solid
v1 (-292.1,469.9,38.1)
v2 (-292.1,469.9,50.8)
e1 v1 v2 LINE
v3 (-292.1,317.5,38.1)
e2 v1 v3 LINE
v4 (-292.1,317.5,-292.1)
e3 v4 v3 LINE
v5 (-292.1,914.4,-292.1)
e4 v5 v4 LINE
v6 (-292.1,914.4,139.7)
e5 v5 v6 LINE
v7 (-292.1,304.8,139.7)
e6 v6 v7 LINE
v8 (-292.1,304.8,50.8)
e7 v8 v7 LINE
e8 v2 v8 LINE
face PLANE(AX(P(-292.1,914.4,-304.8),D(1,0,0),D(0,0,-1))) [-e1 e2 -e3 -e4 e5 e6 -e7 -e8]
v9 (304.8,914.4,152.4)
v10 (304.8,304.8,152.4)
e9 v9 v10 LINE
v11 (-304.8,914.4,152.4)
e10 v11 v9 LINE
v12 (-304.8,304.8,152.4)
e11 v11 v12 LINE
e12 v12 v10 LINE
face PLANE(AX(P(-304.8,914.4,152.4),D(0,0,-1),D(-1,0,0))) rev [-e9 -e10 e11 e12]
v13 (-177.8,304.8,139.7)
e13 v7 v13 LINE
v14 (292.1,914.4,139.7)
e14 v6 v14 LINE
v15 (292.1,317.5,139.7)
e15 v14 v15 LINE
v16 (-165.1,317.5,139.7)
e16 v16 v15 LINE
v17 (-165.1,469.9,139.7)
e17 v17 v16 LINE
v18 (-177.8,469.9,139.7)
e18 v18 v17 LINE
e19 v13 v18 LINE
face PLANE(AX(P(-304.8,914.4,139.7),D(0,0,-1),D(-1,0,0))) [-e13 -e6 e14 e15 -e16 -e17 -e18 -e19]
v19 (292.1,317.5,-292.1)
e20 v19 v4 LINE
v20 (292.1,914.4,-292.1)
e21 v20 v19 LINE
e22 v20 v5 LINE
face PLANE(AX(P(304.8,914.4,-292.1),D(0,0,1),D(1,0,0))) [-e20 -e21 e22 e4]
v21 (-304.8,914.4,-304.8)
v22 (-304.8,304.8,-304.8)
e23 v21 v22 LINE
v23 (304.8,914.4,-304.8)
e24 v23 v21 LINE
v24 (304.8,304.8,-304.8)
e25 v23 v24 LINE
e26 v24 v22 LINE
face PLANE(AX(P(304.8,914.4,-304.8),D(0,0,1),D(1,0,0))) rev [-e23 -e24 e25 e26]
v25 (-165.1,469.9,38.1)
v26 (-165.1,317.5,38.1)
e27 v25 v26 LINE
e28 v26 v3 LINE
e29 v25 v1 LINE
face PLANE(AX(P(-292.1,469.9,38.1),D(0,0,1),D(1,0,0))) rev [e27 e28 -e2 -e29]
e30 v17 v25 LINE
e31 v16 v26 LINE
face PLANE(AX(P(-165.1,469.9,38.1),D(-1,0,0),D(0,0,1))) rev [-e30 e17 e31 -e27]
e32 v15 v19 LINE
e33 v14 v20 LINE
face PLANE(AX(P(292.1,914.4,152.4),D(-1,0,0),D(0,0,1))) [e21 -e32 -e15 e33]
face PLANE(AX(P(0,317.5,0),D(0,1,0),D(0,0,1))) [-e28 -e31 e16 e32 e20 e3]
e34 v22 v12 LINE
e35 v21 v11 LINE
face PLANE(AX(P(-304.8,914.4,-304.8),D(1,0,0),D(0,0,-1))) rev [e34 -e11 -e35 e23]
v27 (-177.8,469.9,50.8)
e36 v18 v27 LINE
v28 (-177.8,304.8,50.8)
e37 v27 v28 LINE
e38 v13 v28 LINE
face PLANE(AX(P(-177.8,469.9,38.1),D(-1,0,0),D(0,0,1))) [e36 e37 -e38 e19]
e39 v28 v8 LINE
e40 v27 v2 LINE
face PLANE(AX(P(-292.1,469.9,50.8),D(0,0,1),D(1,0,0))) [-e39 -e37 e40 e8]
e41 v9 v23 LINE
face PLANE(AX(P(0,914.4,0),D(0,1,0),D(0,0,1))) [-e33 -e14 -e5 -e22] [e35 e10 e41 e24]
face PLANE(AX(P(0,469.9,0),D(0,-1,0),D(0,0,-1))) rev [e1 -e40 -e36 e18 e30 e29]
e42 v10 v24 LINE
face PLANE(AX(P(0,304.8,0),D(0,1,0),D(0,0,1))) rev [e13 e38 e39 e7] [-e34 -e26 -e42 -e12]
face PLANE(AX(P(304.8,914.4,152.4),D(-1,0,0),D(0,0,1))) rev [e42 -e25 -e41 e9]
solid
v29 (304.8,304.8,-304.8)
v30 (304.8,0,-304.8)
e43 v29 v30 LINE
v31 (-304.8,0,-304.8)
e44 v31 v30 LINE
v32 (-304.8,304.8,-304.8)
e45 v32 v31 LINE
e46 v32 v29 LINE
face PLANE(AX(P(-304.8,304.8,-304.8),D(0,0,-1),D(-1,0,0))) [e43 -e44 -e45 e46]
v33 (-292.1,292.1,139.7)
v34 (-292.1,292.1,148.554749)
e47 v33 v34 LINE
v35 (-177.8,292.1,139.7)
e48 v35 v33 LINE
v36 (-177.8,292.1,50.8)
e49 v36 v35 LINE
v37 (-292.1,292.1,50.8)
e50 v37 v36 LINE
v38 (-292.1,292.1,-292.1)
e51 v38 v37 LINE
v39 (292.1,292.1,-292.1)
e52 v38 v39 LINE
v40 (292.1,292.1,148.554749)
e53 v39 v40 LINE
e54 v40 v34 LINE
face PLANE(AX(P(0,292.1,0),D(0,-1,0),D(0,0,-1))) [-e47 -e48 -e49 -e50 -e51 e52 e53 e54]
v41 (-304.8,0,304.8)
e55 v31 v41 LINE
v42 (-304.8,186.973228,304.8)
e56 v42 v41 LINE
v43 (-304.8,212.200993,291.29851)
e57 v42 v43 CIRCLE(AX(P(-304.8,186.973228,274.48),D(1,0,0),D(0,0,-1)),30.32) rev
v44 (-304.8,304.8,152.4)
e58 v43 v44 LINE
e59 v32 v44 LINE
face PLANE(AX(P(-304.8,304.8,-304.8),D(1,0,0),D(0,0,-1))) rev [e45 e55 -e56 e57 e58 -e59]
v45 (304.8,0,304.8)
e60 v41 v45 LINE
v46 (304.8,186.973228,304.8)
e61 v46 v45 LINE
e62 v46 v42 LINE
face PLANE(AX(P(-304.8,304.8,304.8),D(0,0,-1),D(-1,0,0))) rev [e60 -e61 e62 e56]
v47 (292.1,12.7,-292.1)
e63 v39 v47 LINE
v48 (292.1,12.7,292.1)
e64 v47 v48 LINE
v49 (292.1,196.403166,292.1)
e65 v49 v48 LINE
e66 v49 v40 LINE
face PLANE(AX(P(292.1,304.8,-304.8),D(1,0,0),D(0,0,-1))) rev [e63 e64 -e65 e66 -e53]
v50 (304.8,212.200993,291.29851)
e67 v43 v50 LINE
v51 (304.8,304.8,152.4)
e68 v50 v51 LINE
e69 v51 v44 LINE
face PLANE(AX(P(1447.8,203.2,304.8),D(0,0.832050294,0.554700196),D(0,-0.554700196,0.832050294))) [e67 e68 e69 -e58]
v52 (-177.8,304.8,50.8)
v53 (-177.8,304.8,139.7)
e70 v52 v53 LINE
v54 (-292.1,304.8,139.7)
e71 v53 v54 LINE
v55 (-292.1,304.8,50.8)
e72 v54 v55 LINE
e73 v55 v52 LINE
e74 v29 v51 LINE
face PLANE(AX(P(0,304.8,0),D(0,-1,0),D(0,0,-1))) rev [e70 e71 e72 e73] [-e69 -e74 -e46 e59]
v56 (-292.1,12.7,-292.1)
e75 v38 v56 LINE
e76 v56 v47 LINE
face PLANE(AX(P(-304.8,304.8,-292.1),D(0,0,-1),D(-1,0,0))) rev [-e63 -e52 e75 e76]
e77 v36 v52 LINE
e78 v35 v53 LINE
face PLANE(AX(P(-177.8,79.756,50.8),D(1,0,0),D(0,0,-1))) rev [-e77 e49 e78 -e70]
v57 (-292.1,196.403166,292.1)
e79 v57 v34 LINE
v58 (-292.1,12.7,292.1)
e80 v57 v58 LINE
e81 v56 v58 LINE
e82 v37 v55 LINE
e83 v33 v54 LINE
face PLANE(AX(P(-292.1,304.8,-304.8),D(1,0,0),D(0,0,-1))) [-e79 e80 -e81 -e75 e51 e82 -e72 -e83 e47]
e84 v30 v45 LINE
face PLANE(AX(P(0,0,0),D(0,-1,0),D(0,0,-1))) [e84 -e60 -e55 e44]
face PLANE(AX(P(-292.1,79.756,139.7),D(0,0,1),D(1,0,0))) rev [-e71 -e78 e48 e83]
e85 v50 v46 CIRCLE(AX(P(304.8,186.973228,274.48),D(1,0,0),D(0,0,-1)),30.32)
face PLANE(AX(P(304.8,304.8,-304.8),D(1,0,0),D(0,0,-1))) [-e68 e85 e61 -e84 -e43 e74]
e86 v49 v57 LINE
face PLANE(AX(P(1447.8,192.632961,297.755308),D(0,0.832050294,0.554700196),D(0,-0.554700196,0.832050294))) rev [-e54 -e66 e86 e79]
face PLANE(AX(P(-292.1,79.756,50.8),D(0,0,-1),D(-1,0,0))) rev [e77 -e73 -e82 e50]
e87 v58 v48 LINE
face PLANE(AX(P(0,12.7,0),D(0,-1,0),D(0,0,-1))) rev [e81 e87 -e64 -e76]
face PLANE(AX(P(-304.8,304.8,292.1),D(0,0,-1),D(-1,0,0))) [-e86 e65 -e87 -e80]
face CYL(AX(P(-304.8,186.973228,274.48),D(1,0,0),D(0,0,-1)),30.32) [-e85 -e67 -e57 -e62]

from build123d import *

# Parameters (mm, degrees)
SKETCH1_W               = 609.6
SKETCH1_H               = 609.6
BOSS_EXTRUDE1_DEPTH     = 304.8
CUT_EXTRUDE2_DEPTH      = 747.6044736
CUT_EXTRUDE2_DEPTH_BACK = 609.6
SHELL11_T               = 12.7
SKETCH13_W              = 609.6
SKETCH13_H              = 457.2
BOSS_EXTRUDE7_DEPTH     = 609.6
SHELL13_T               = -12.7
SKETCH14_W              = 127
SKETCH14_H              = 101.6
BOSS_EXTRUDE8_DEPTH     = 152.4
SHELL14_START           = -292.1
SHELL14_OUTLINE_W       = 152.4
SHELL14_OUTLINE_H       = 88.9
SHELL14_DEPTH           = 114.3
SKETCH17_W              = 114.3
SKETCH17_H              = 88.9
CUT_EXTRUDE3_DEPTH      = 237.744
FILLET2_R               = 30.32


# Read off the part's stored shape, not the designer's step: Shell14
with BuildPart() as part:
    # Sketch1 → Boss-Extrude1 (new body)
    with BuildSketch(Plane(origin=(0, 0, 0), x_dir=(1, 0, 0), z_dir=(0, 1, 0))):
        Rectangle(SKETCH1_W, SKETCH1_H)
    extrude(amount=BOSS_EXTRUDE1_DEPTH)

    # Sketch11 → Cut-Extrude2 (cut, two sides: drawn at the far end of the back side and taken through both)
    with BuildSketch(Plane(origin=(304.8, 0, 0), x_dir=(0, 0, -1), z_dir=(1, 0, 0)).offset(-CUT_EXTRUDE2_DEPTH_BACK)):
        Polygon((-1382.429640083, -515.219760055), (-304.8, 203.2), (-152.4, 304.8), (925.229640083, 1023.219760055), (-511.609880028, 3178.47904022), (-2819.269160193, 1640.03952011), align=None)
    extrude(amount=CUT_EXTRUDE2_DEPTH + CUT_EXTRUDE2_DEPTH_BACK, mode=Mode.SUBTRACT)

    # Shell11 (no face opened: a closed hollow body)
    add(offset(amount=-SHELL11_T, mode=Mode.PRIVATE), mode=Mode.SUBTRACT)


with BuildPart() as body_2:
    # Sketch13 → Boss-Extrude7 (new body)
    with BuildSketch(Plane(origin=(0, 304.8, 0), x_dir=(1, 0, 0), z_dir=(0, 1, 0))):
        with Locations((0, 76.2)):
            Rectangle(SKETCH13_W, SKETCH13_H)
    extrude(amount=BOSS_EXTRUDE7_DEPTH)

    # Shell13
    shell13_openings = [body_2.faces().sort_by_distance(p)[0] for p in [
        (0, 914.4, -76.2),
    ]]
    offset(amount=SHELL13_T, openings=shell13_openings, kind=Kind.INTERSECTION)

    # Sketch14 → Boss-Extrude8 (add)
    with BuildSketch(Plane(origin=(0, 317.5, 0), x_dir=(1, 0, 0), z_dir=(0, 1, 0))):
        with Locations((-228.6, -88.9)):
            Rectangle(SKETCH14_W, SKETCH14_H)
    extrude(amount=BOSS_EXTRUDE8_DEPTH)

    # Shell14 outline → Shell14 (cut)
    with BuildSketch(Plane.YZ.offset(SHELL14_START)):
        with Locations((393.7, 95.25)):
            Rectangle(SHELL14_OUTLINE_W, SHELL14_OUTLINE_H)
    extrude(amount=SHELL14_DEPTH, mode=Mode.SUBTRACT)


with BuildPart() as cut_extrude3_tool:
    # Sketch17 → Cut-Extrude3 (new body)
    with BuildSketch(Plane(origin=(0, 317.5, 0), x_dir=(1, 0, 0), z_dir=(0, 1, 0))):
        with Locations((-234.95, -95.25)):
            Rectangle(SKETCH17_W, SKETCH17_H)
    extrude(amount=-CUT_EXTRUDE3_DEPTH)


with BuildPart() as part_1:
    add(part.part)

    # Cut-Extrude3: cut by cut_extrude3_tool
    add(cut_extrude3_tool.part, mode=Mode.SUBTRACT)

    # Fillet2
    fillet2_edges = [part_1.edges().sort_by_distance(p)[0] for p in [
        (0, 203.2, 304.8),
    ]]
    fillet(fillet2_edges, radius=FILLET2_R)


with BuildPart() as body_2_1:
    add(body_2.part)

    # Cut-Extrude3: cut by cut_extrude3_tool
    add(cut_extrude3_tool.part, mode=Mode.SUBTRACT)


solid = Compound([part_1.part, body_2_1.part])
